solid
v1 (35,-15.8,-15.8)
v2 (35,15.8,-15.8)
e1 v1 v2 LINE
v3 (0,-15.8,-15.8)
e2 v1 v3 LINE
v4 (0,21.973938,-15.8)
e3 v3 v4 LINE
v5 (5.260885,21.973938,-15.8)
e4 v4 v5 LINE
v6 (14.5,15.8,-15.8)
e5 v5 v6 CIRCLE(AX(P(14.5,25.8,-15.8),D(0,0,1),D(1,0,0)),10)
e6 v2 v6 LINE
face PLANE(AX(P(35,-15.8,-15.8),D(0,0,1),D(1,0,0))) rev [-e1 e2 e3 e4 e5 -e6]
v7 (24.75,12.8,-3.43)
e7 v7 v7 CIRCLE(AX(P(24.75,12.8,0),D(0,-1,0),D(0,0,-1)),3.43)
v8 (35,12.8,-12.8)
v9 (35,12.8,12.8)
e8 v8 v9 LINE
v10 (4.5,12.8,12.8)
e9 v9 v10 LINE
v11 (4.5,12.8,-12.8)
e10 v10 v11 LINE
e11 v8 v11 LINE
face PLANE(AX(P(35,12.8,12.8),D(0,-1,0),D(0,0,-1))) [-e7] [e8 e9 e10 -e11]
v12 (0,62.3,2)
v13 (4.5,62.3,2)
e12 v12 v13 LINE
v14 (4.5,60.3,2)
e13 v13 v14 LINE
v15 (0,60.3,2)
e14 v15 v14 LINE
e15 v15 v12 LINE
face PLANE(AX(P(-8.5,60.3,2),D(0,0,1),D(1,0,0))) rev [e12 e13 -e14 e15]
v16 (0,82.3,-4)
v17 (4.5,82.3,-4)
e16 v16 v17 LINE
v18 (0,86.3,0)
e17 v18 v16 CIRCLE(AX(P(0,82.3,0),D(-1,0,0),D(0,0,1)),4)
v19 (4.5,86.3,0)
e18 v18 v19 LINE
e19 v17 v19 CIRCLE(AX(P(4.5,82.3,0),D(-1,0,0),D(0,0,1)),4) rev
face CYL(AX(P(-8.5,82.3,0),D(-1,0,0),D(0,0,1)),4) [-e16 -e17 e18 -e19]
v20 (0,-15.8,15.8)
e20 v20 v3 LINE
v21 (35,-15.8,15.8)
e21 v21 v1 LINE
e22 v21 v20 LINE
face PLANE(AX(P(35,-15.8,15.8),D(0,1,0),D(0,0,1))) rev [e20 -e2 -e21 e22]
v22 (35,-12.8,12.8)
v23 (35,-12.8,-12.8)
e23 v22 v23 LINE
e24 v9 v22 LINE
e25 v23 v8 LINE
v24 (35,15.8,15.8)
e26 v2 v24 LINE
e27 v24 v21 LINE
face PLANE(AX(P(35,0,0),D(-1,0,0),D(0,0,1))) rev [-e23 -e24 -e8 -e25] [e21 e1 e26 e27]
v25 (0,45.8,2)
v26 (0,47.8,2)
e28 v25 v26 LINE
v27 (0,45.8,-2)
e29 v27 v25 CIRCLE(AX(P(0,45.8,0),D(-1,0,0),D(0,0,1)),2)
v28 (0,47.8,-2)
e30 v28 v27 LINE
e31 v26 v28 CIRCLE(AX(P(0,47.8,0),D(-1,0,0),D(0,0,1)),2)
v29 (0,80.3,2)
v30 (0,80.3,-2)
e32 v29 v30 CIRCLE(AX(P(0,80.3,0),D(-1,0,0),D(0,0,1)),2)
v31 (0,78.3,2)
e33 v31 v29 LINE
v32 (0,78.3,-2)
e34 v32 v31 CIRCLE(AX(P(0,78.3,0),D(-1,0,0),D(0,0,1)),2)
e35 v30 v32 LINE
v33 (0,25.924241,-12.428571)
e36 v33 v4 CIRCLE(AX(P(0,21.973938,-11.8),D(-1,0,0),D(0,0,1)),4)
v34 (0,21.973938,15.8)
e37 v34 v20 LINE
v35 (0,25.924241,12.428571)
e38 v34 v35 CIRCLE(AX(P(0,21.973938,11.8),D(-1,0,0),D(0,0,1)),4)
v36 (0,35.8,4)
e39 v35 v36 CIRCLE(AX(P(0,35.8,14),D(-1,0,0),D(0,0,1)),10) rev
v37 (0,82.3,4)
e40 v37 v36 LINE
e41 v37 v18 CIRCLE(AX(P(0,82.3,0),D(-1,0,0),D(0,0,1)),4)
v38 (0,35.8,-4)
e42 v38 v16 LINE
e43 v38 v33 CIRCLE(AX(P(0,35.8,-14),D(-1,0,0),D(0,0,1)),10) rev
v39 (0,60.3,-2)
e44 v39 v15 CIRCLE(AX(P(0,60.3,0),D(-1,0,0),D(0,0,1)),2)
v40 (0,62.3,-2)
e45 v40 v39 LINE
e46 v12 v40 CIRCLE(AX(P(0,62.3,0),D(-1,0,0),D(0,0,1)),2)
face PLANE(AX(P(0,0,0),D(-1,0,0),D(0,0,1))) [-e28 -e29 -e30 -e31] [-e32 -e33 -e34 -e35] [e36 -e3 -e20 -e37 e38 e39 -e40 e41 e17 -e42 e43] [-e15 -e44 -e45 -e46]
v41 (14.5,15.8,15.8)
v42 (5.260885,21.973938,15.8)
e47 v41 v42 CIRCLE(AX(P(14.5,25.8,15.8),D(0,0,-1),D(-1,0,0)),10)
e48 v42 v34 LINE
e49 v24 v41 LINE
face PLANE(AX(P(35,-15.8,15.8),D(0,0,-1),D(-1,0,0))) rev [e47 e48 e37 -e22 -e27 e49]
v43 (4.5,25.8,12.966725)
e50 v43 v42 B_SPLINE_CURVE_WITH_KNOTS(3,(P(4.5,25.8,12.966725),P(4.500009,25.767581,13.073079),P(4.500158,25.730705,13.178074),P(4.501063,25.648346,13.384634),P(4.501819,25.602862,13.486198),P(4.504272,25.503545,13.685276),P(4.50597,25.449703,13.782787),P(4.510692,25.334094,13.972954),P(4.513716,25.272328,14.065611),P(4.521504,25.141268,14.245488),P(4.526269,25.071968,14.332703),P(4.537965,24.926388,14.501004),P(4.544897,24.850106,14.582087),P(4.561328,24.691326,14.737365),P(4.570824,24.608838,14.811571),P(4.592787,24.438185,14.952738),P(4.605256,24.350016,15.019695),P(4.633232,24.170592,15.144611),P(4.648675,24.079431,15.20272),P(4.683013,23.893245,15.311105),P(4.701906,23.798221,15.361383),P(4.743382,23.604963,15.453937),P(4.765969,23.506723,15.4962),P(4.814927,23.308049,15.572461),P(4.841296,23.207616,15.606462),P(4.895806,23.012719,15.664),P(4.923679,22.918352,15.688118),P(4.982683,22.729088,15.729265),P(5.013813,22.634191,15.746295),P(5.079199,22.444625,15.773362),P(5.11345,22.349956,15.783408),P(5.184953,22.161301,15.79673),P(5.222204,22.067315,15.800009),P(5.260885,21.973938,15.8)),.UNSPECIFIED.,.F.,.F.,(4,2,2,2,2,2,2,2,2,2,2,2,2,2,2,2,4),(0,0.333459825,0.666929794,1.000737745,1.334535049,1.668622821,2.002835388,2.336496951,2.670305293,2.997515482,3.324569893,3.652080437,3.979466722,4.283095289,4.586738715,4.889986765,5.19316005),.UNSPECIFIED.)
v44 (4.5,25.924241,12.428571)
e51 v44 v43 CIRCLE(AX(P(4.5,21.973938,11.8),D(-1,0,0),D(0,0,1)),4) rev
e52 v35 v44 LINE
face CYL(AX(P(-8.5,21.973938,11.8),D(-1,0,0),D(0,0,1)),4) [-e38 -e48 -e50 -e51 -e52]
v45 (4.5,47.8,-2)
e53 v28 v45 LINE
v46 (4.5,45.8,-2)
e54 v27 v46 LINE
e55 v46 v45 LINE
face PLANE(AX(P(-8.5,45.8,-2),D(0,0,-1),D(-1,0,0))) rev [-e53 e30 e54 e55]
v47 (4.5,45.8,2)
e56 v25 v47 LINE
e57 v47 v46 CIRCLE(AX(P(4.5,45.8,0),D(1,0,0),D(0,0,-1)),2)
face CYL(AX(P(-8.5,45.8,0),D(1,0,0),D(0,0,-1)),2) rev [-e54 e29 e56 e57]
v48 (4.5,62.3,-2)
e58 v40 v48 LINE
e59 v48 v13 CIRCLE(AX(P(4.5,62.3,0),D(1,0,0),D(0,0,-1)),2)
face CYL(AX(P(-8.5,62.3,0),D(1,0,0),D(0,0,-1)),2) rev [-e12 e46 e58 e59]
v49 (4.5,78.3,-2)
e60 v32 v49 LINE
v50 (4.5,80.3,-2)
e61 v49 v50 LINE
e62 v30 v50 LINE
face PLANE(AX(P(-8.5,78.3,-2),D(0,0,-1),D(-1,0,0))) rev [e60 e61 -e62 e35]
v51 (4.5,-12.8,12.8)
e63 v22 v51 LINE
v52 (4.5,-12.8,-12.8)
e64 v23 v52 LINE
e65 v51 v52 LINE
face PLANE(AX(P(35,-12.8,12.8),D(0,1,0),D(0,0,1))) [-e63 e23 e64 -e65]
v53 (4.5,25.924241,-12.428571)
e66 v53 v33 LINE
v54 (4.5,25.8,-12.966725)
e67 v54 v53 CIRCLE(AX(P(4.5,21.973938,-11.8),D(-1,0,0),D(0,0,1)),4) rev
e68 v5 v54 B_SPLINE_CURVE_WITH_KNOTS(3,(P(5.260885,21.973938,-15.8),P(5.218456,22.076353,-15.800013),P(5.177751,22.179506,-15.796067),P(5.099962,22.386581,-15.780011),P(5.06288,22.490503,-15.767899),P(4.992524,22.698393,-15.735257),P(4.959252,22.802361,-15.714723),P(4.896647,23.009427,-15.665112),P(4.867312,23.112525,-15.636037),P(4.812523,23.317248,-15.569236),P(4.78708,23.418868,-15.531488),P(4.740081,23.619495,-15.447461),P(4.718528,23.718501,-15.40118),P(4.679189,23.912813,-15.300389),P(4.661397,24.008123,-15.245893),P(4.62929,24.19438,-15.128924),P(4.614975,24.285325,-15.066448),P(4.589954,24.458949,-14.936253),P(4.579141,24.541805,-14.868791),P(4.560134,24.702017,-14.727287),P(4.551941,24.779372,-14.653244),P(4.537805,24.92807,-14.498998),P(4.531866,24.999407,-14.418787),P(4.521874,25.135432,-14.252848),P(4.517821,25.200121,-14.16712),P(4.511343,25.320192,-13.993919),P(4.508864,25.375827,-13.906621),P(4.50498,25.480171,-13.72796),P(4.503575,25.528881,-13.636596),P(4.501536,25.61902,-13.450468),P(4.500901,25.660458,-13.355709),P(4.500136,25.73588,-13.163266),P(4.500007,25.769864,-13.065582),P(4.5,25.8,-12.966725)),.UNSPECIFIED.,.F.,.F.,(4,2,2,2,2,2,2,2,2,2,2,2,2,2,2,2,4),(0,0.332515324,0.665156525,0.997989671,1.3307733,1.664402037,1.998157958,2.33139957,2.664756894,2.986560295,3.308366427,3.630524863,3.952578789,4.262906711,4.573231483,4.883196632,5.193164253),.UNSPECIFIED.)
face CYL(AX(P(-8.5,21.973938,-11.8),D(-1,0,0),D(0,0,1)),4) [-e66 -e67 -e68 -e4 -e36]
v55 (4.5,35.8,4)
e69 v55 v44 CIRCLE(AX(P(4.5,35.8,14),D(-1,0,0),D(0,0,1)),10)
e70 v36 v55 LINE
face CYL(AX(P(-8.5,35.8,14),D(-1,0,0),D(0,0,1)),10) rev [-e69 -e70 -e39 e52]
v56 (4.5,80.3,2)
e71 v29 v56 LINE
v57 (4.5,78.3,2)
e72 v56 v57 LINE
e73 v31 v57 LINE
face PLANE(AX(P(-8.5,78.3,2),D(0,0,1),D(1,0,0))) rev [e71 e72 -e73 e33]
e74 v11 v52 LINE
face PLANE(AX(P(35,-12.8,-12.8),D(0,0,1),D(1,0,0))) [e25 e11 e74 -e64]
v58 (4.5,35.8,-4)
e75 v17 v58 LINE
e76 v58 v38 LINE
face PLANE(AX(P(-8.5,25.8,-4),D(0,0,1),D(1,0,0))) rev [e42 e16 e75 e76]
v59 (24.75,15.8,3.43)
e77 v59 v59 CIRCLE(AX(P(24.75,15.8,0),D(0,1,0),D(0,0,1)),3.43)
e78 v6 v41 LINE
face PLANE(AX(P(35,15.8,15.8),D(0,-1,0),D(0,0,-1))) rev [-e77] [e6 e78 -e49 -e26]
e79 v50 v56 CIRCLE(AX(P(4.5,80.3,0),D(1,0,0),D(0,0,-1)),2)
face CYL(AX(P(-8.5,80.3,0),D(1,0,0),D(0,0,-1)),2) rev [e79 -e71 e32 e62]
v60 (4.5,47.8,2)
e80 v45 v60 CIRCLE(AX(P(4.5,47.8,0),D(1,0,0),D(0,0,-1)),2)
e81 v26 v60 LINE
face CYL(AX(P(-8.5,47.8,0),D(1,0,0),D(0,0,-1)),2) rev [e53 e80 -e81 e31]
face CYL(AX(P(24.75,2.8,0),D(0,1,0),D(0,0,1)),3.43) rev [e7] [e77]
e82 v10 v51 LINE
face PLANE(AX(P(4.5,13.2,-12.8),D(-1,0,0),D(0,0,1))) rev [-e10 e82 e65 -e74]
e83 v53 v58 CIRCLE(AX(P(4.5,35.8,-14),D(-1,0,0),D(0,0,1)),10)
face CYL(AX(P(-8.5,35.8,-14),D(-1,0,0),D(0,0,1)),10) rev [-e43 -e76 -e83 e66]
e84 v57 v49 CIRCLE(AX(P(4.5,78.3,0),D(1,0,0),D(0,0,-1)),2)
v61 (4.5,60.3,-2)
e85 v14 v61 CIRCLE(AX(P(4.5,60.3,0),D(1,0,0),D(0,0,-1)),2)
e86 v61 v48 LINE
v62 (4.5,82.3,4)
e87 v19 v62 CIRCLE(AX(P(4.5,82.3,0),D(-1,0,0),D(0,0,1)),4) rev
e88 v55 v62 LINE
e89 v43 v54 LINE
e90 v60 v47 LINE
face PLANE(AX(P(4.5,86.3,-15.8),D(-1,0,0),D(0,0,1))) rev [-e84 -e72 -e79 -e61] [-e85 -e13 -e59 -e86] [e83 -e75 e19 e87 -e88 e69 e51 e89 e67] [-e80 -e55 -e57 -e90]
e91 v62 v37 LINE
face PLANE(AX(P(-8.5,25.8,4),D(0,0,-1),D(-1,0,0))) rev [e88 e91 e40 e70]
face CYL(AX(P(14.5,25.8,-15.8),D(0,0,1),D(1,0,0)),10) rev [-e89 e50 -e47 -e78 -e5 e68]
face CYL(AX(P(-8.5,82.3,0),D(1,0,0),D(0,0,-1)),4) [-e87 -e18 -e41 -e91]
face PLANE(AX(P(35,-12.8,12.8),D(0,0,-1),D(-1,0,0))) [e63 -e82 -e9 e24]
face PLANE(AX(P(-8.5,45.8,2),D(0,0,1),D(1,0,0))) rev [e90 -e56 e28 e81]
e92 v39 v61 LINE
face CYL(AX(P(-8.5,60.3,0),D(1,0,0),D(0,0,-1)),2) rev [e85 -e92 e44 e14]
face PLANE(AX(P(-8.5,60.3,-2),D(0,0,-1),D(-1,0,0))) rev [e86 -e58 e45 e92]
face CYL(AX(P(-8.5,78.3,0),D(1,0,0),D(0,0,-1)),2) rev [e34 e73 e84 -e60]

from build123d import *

# Parameters (mm, degrees)
SKETCH1_W           = 31.6
SKETCH1_H           = 31.6
SKETCH1_W_2         = 25.6
SKETCH1_H_2         = 25.6
BOSS_EXTRUDE1_DEPTH = 35
SKETCH2_W           = 4.5
SKETCH2_H           = 31.6
BOSS_EXTRUDE2_DEPTH = 70.5
FILLET1_R           = 10
SKETCH3_W           = 11.8
SKETCH3_H           = 60.5
CUT_EXTRUDE1_DEPTH  = 13
FILLET2_R           = 10
FILLET3_R           = 4
FILLET4_R           = 4
FILLET5_R           = 4
FILLET6_R           = 4
SKETCH4_R           = 3.43
CUT_EXTRUDE2_DEPTH  = 13
SKETCH6_W           = 4.5
SKETCH6_H           = 25.6
BOSS_EXTRUDE3_DEPTH = 26


# Some blends are built 0.0001 mm under size
with BuildPart() as part:
    # Sketch1 → Boss-Extrude1 (new body)
    with BuildSketch(Plane(origin=(0, 0, 0), x_dir=(0, 0, -1), z_dir=(1, 0, 0))):
        Rectangle(SKETCH1_W, SKETCH1_H)
        Rectangle(SKETCH1_W_2, SKETCH1_H_2, mode=Mode.SUBTRACT)
    extrude(amount=BOSS_EXTRUDE1_DEPTH)

    # Sketch2 → Boss-Extrude2 (add)
    with BuildSketch(Plane(origin=(0, 15.8, 0), x_dir=(1, 0, 0), z_dir=(0, 1, 0))):
        with Locations((2.25, 0)):
            Rectangle(SKETCH2_W, SKETCH2_H)
    extrude(amount=BOSS_EXTRUDE2_DEPTH)

    # Fillet1
    fillet1_edges = [part.edges().sort_by_distance(p)[0] for p in [
        (4.5, 15.8, 0),
    ]]
    fillet(fillet1_edges, radius=FILLET1_R)

    # Sketch3 → Cut-Extrude1 (cut)
    with BuildSketch(Plane(origin=(4.5, 0, 0), x_dir=(0, 0, -1), z_dir=(1, 0, 0))):
        with BuildLine():
            Line((-2, 45.8), (-2, 47.8))
            ThreePointArc((-2, 47.8), (0, 49.8), (2, 47.8))
            Line((2, 47.8), (2, 45.8))
            ThreePointArc((2, 45.8), (0, 43.8), (-2, 45.8))
        make_face()
        with BuildLine():
            Line((-2, 60.3), (-2, 62.3))
            ThreePointArc((-2, 62.3), (0, 64.3), (2, 62.3))
            Line((2, 62.3), (2, 60.3))
            ThreePointArc((2, 60.3), (0, 58.3), (-2, 60.3))
        make_face()
        with BuildLine():
            Line((-2, 78.3), (-2, 80.3))
            ThreePointArc((-2, 80.3), (0, 82.3), (2, 80.3))
            Line((2, 80.3), (2, 78.3))
            ThreePointArc((2, 78.3), (0, 76.3), (-2, 78.3))
        make_face()
        with Locations((-9.9, 56.05)):
            Rectangle(SKETCH3_W, SKETCH3_H)
        with Locations((9.9, 56.05)):
            Rectangle(SKETCH3_W, SKETCH3_H)
    extrude(amount=-CUT_EXTRUDE1_DEPTH, mode=Mode.SUBTRACT)

    # Fillet2
    fillet2_edges = [part.edges().sort_by_distance(p)[0] for p in [
        (2.25, 25.8, 4),
        (2.25, 25.8, -4),
    ]]
    fillet(fillet2_edges, radius=FILLET2_R)

    # Fillet3
    fillet3_edges = [part.edges().sort_by_distance(p)[0] for p in [
        (2.25, 86.3, 4),
    ]]
    fillet(fillet3_edges, radius=FILLET3_R)

    # Fillet4
    fillet4_edges = [part.edges().sort_by_distance(p)[0] for p in [
        (2.25, 86.3, -4),
    ]]
    fillet(fillet4_edges, radius=FILLET4_R - 0.0001)  # a hair under: the kernel refuses the full size

    # Fillet5
    # the kernel refuses this fillet: 4 mm, written as the material it takes off along each edge
    with BuildSketch(Plane(origin=(14.065155865, 25.8, 15.8), x_dir=(0, 0.03682620114116805, -0.9993216853994064), z_dir=(-1, 0, 0))) as fillet5_piece_1:
        with BuildLine():
            CenterArc((3.8563874, 3.970771877), FILLET5_R, 182.110463108, 80.958903851)
            Line((-0.140899342, 3.823467072), (-0.540628016, 3.808736592))
            Line((-0.540628016, 3.808736592), (-0.399728674, -0.01473048))
            Line((-0.399728674, -0.01473048), (0.01473048, -0.399728674))
            ThreePointArc((0.01473048, -0.399728674), (1.813509514, -0.333441512), (3.325449974, -0.397077188))
            Line((3.325449974, -0.397077188), (3.373717013, 0))
        make_face()
    extrude(amount=23.630311731, mode=Mode.SUBTRACT)

    # Fillet6
    # the kernel refuses this fillet: 4 mm, written as the material it takes off along each edge
    with BuildSketch(Plane(origin=(14.065155865, 25.8, -15.8), x_dir=(0, 0.03682620114116807, 0.9993216853994065), z_dir=(-1, 0, 0))) as fillet6_piece_1:
        with BuildLine():
            CenterArc((3.8563874, -3.970771877), FILLET6_R, 96.93063304, 80.958903851)
            Line((-0.140899342, -3.823467072), (-0.540628016, -3.808736592))
            Line((-0.540628016, -3.808736592), (-0.399728674, 0.01473048))
            Line((-0.399728674, 0.01473048), (0.01473048, 0.399728674))
            ThreePointArc((0.01473048, 0.399728674), (1.813509514, 0.333441512), (3.325449974, 0.397077188))
            Line((3.325449974, 0.397077188), (3.373717013, 0))
        make_face()
    extrude(amount=23.630311731, mode=Mode.SUBTRACT)

    # Sketch4 → Cut-Extrude2 (cut)
    with BuildSketch(Plane(origin=(0, 15.8, 0), x_dir=(1, 0, 0), z_dir=(0, 1, 0))):
        with Locations(Location((24.75, 0, 0), (0, 0, 270))):
            Circle(SKETCH4_R)
    extrude(amount=-CUT_EXTRUDE2_DEPTH, mode=Mode.SUBTRACT)

    # Sketch6 → Boss-Extrude3 (add)
    with BuildSketch(Plane(origin=(0, -12.8, 0), x_dir=(1, 0, 0), z_dir=(0, 1, 0))):
        with Locations((2.25, 0)):
            Rectangle(SKETCH6_W, SKETCH6_H)
    extrude(amount=BOSS_EXTRUDE3_DEPTH)


solid = part.part
